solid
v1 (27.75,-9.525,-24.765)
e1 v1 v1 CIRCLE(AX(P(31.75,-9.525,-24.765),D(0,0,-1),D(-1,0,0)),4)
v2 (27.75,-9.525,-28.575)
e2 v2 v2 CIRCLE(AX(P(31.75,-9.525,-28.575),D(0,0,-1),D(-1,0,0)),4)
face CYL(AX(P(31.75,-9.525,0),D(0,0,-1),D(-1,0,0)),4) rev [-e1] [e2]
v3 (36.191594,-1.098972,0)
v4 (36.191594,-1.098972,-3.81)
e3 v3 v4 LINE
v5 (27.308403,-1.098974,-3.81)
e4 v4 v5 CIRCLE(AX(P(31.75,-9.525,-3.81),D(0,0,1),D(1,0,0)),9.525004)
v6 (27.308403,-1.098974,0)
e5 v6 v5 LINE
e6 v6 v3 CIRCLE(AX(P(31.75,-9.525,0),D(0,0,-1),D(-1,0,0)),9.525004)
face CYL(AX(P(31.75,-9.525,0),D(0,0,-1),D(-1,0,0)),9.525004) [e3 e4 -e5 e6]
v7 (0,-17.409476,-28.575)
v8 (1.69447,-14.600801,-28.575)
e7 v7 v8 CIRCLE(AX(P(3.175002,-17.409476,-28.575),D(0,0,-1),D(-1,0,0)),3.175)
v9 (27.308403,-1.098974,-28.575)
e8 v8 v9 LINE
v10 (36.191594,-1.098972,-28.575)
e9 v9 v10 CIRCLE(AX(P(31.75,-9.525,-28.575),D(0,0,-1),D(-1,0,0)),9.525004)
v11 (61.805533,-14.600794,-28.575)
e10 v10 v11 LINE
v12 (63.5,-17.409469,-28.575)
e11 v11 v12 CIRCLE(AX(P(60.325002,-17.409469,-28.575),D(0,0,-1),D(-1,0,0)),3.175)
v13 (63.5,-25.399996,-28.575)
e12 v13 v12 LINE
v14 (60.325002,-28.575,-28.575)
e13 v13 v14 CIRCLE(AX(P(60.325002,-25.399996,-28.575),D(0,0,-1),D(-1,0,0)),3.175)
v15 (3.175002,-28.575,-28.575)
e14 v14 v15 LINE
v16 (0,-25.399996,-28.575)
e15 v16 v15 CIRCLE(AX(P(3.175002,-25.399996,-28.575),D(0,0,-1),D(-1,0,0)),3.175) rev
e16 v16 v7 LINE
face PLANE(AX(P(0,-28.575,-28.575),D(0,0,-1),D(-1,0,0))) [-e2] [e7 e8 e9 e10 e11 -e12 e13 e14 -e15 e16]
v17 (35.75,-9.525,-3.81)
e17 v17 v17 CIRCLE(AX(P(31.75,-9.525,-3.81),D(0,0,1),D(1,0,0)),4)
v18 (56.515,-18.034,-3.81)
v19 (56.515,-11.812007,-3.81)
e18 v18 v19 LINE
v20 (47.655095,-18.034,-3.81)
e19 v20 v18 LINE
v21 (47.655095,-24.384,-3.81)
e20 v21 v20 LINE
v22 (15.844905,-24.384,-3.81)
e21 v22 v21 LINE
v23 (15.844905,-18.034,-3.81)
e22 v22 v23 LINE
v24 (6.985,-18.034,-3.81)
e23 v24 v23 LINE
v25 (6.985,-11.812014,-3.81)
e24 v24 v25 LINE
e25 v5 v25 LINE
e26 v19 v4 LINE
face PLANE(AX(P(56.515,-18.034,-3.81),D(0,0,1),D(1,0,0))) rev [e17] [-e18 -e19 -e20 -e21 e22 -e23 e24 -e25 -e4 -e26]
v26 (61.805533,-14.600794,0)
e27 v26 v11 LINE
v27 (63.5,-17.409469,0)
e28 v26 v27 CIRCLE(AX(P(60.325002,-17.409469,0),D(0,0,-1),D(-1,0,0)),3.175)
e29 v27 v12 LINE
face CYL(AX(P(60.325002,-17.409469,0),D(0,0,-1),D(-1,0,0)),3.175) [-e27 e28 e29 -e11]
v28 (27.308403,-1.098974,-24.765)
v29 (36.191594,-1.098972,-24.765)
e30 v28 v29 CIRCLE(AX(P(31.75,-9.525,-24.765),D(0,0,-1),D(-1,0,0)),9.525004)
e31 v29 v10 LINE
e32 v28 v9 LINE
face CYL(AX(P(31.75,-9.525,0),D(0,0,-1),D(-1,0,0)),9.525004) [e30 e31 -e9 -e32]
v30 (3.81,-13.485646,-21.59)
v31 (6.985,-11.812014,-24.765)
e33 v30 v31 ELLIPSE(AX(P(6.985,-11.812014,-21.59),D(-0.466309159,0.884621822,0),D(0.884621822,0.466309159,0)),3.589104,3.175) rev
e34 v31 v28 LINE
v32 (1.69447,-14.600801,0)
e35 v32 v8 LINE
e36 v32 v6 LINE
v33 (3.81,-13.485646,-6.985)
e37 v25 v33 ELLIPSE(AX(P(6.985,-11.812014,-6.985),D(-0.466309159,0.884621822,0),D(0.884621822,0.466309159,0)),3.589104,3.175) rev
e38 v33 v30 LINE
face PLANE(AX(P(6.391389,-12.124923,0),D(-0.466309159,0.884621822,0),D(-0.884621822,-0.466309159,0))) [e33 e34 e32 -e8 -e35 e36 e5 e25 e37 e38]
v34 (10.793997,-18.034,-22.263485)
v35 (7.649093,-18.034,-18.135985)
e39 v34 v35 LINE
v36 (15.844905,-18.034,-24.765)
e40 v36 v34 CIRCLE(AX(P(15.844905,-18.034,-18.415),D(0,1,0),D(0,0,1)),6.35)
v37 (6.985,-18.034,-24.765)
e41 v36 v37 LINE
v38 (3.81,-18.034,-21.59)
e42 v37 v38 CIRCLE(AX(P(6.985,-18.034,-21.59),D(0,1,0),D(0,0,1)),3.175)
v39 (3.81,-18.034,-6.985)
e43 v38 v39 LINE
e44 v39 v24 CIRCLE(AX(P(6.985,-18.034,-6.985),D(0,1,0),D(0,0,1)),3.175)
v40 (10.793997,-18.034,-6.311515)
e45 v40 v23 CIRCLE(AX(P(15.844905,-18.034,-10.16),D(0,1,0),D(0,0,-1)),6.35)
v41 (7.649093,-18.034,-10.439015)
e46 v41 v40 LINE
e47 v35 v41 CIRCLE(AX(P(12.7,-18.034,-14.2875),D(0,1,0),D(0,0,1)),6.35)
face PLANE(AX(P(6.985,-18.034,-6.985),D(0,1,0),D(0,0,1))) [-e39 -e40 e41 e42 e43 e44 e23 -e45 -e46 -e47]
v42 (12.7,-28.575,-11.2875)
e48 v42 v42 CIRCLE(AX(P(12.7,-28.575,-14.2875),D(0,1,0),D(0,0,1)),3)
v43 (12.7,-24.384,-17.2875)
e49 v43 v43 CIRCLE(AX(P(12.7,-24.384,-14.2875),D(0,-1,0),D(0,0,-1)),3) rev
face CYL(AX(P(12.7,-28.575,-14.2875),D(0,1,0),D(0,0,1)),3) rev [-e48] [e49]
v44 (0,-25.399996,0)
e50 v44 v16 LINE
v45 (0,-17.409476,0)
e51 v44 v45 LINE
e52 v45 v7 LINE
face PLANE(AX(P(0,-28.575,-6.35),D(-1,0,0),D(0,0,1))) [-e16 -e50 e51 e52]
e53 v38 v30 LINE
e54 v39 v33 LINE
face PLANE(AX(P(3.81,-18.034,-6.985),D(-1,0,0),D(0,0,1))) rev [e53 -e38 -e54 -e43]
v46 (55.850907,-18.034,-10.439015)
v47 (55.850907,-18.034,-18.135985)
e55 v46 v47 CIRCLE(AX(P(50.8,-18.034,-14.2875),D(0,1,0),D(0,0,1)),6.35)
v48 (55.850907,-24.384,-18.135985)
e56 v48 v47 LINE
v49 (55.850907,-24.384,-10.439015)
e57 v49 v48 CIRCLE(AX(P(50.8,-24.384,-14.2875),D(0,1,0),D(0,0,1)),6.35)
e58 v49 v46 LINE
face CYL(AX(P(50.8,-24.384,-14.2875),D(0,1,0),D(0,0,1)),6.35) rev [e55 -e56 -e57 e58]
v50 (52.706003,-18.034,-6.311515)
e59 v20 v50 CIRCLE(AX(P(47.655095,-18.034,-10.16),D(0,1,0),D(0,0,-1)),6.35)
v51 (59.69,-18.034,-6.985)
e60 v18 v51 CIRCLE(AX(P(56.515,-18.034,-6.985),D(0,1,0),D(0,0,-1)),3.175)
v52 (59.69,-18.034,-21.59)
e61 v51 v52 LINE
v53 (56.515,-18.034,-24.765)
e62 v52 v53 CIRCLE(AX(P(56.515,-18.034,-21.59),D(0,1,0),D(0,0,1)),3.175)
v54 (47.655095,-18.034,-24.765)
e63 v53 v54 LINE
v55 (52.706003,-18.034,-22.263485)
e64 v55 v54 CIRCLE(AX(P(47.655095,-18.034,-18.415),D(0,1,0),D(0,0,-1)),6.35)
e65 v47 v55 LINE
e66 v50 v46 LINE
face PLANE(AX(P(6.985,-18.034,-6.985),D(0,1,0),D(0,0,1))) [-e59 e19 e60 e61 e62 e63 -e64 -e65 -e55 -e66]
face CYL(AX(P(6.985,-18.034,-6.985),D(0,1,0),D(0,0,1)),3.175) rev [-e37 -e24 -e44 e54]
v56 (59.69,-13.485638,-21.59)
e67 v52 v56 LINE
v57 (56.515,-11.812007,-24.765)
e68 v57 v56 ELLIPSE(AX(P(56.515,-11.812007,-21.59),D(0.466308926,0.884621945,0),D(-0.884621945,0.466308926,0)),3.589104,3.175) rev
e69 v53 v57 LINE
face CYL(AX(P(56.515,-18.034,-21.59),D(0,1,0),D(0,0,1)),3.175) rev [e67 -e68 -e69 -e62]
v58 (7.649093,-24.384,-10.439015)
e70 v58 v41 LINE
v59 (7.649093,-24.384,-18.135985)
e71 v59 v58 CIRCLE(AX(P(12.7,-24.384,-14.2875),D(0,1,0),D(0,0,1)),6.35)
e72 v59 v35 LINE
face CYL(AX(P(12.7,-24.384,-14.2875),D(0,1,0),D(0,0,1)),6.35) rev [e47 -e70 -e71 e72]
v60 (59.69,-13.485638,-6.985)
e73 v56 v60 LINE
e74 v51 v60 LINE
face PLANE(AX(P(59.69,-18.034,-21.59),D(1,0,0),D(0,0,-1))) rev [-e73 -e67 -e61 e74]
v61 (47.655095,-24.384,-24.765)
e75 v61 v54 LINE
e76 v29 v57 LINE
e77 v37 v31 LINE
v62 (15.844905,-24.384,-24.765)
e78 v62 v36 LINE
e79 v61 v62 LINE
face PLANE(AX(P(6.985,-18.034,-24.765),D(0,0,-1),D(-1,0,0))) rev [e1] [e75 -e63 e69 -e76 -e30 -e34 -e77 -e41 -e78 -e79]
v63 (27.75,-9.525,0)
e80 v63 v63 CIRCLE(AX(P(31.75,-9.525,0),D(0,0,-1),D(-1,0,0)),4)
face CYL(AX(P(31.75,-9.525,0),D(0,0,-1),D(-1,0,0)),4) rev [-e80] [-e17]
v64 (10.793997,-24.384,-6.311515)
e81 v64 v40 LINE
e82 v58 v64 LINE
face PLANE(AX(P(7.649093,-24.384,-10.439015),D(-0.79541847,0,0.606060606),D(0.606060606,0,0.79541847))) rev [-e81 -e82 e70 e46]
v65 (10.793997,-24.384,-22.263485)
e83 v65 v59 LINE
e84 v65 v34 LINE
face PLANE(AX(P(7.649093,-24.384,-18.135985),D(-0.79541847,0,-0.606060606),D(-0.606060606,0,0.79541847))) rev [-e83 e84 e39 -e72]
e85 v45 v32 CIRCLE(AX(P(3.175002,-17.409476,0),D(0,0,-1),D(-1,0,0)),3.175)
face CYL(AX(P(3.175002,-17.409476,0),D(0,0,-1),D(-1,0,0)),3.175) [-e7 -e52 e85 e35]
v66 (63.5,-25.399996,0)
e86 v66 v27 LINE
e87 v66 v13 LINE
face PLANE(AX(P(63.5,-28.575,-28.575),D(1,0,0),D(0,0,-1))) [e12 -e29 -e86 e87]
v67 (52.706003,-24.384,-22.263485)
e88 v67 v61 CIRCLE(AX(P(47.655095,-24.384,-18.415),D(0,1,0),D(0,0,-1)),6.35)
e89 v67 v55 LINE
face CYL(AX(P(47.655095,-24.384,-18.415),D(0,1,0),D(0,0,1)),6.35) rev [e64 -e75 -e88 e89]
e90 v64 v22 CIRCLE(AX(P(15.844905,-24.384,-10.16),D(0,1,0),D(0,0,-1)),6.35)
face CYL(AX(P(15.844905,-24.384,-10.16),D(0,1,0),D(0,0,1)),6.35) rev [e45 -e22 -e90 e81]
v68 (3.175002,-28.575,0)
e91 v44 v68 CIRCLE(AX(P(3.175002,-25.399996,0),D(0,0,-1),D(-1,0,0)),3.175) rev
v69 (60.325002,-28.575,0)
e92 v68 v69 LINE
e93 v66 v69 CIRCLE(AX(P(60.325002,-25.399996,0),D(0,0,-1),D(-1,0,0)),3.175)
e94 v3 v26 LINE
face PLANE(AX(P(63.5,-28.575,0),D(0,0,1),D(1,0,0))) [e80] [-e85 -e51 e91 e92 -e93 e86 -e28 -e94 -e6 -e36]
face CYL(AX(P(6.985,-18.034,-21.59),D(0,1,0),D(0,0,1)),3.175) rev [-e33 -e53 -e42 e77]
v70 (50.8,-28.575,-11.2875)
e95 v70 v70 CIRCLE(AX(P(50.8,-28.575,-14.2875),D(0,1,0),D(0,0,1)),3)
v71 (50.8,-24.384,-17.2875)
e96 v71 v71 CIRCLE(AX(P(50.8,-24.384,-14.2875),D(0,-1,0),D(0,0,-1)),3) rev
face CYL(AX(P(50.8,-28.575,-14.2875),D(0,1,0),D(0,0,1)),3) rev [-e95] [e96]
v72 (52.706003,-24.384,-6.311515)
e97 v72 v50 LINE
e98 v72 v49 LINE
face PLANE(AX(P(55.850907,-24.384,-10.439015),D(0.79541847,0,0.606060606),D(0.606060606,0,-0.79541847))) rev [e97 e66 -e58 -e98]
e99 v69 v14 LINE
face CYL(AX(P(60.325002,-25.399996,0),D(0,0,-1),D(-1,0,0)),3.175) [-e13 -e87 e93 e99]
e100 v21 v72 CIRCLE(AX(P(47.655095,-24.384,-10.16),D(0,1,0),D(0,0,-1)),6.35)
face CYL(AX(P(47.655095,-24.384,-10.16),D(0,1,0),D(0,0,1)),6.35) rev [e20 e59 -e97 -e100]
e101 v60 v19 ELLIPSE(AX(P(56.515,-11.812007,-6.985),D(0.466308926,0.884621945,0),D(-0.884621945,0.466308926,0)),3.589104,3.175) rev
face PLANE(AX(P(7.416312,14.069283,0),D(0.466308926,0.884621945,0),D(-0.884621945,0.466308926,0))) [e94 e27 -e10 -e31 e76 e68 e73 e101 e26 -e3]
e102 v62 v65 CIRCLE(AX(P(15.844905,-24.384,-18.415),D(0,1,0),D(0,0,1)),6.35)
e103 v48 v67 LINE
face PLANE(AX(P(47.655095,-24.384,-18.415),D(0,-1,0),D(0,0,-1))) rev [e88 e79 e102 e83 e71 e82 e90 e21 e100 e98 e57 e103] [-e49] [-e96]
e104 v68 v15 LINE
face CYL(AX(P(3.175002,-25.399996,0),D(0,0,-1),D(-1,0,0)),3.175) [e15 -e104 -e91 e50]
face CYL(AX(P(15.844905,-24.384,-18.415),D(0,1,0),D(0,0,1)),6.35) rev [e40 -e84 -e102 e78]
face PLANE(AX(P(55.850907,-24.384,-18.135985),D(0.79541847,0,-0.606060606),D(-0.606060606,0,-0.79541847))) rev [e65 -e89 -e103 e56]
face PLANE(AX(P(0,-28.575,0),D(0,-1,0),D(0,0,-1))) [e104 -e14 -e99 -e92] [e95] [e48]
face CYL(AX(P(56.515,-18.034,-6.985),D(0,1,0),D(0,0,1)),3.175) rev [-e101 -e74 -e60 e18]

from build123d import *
from OCP.BRepAlgoAPI import BRepAlgoAPI_Cut
from OCP.TopTools import TopTools_ListOfShape

# Parameters (mm, degrees)
SKETCH1_R              = 3
BOSS_EXTRUDE1_DEPTH    = 28.575
CUT_EXTRUDE1_DEPTH     = 18.034
CUT_EXTRUDE4_DEPTH     = 6.35
CUT_EXTRUDE5_START     = -28.575
CUT_EXTRUDE5_OUTLINE_R = 4
CUT_EXTRUDE5_DEPTH     = 28.575


with BuildPart() as part:
    # Sketch1 → Boss-Extrude1 (new body)
    with BuildSketch(Plane(origin=(0, 0, 0), x_dir=(1, 0, 0), z_dir=(0, 1, 0))):
        Polygon((0, 6.35), (0, 22.225), (0, 28.575), (6.35, 28.575), (57.15, 28.575), (63.5, 28.575), (63.5, 22.225), (63.5, 6.35), (63.5, 0), (57.15, 0), (6.35, 0), (0, 0), align=None)
        with Locations(Location((12.7, 14.2875, 0), (0, 0, 270))):
            Circle(SKETCH1_R, mode=Mode.SUBTRACT)
        with Locations(Location((50.8, 14.2875, 0), (0, 0, 270))):
            Circle(SKETCH1_R, mode=Mode.SUBTRACT)
    extrude(amount=-BOSS_EXTRUDE1_DEPTH)

    # Sketch2 → Cut-Extrude1 (cut)
    with BuildSketch(Plane(origin=(0, 0, 0), x_dir=(1, 0, 0), z_dir=(0, 1, 0))):
        with BuildLine():
            Line((6.985, 24.765), (56.515, 24.765))
            ThreePointArc((56.515, 24.765), (58.76006403, 23.83506403), (59.69, 21.59))
            Line((59.69, 21.59), (59.69, 6.985))
            ThreePointArc((59.69, 6.985), (58.76006403, 4.73993597), (56.515, 3.81))
            Line((56.515, 3.81), (6.985, 3.81))
            ThreePointArc((6.985, 3.81), (4.73993597, 4.73993597), (3.81, 6.985))
            Line((3.81, 6.985), (3.81, 21.59))
            ThreePointArc((3.81, 21.59), (4.73993597, 23.83506403), (6.985, 24.765))
        make_face()
    extrude(amount=-CUT_EXTRUDE1_DEPTH, mode=Mode.SUBTRACT)

    # Sketch4 → Cut-Extrude4 (cut)
    with BuildSketch(Plane(origin=(0, -18.034, 0), x_dir=(1, 0, 0), z_dir=(0, 1, 0))):
        with BuildLine():
            Line((55.850907282, 18.135984848), (52.706002748, 22.263484848))
            ThreePointArc((52.706002748, 22.263484848), (50.473305999, 24.105359338), (47.655095466, 24.765))
            Line((47.655095466, 24.765), (15.844904534, 24.765))
            ThreePointArc((15.844904534, 24.765), (13.026694001, 24.105359338), (10.793997252, 22.263484848))
            Line((10.793997252, 22.263484848), (7.649092718, 18.135984848))
            ThreePointArc((7.649092718, 18.135984848), (6.35, 14.2875), (7.649092718, 10.439015152))
            Line((7.649092718, 10.439015152), (10.793997252, 6.311515152))
            ThreePointArc((10.793997252, 6.311515152), (13.026694001, 4.469640662), (15.844904534, 3.81))
            Line((15.844904534, 3.81), (47.655095466, 3.81))
            ThreePointArc((47.655095466, 3.81), (50.473305999, 4.469640662), (52.706002748, 6.311515152))
            Line((52.706002748, 6.311515152), (55.850907282, 10.439015152))
            ThreePointArc((55.850907282, 10.439015152), (57.15, 14.2875), (55.850907282, 18.135984848))
        make_face()
    extrude(amount=-CUT_EXTRUDE4_DEPTH, mode=Mode.SUBTRACT)


with BuildPart() as cut_extrude5_tool:
    # Cut-Extrude5: read off the stored shape, not the designer's step
    # Cut-Extrude5 outline → Cut-Extrude5 (new body)
    with BuildSketch(Plane(origin=(0, 0, -28.575), x_dir=(-1, 0, 0), z_dir=(0, 0, -1)).offset(CUT_EXTRUDE5_START)):
        with BuildLine():
            ThreePointArc((-31.75, 4.067e-06), (-29.462231849, -0.278821364), (-27.308403366, -1.098973545))
            Line((-27.308403366, -1.098973545), (-1.694470317, -14.600801413))
            ThreePointArc((-1.694470317, -14.600801413), (-0.456425728, -15.769363319), (-1.896e-06, -17.409475699))
            Line((-1.896e-06, -17.409475699), (0, 0))
            Line((0, 0), (-31.75, 4.067e-06))
        make_face()
        with BuildLine():
            ThreePointArc((-36.191594414, -1.098972375), (-34.037766933, -0.278821063), (-31.75, 4.067e-06))
            Line((-31.75, 4.067e-06), (-63.5, 0))
            Line((-63.5, 0), (-63.500001896, -17.409469074))
            ThreePointArc((-63.500001896, -17.409469074), (-63.043577848, -15.769356336), (-61.805532735, -14.600794399))
            Line((-61.805532735, -14.600794399), (-36.191594414, -1.098972375))
        make_face()
        with BuildLine():
            Line((0, -28.575), (-1.896e-06, -25.399996402))
            ThreePointArc((-1.896e-06, -25.399996402), (-0.929937865, -27.645060432), (-3.175001896, -28.574996402))
            Line((-3.175001896, -28.574996402), (0, -28.575))
        make_face()
        with BuildLine():
            ThreePointArc((-60.325001896, -28.574996402), (-62.570065927, -27.645060433), (-63.500001896, -25.399996402))
            Line((-63.500001896, -25.399996402), (-63.5, -28.575))
            Line((-63.5, -28.575), (-60.325001896, -28.574996402))
        make_face()
        with Locations((-31.75, -9.525)):
            Circle(CUT_EXTRUDE5_OUTLINE_R)
    extrude(amount=CUT_EXTRUDE5_DEPTH)


with BuildPart() as part_1:
    add(part.part)

    # Cut-Extrude5: cut by cut_extrude5_tool, with a tolerance
    cut_extrude5_stock = TopTools_ListOfShape()
    cut_extrude5_stock.Append(part_1.part.wrapped)
    cut_extrude5_tools = TopTools_ListOfShape()
    cut_extrude5_tools.Append(cut_extrude5_tool.part.wrapped)
    cut_extrude5_cut = BRepAlgoAPI_Cut()
    cut_extrude5_cut.SetArguments(cut_extrude5_stock)
    cut_extrude5_cut.SetTools(cut_extrude5_tools)
    cut_extrude5_cut.SetFuzzyValue(0.00001)
    cut_extrude5_cut.Build()
    add(Compound.cast(cut_extrude5_cut.Shape()).solids(), mode=Mode.REPLACE)


solid = part_1.part
